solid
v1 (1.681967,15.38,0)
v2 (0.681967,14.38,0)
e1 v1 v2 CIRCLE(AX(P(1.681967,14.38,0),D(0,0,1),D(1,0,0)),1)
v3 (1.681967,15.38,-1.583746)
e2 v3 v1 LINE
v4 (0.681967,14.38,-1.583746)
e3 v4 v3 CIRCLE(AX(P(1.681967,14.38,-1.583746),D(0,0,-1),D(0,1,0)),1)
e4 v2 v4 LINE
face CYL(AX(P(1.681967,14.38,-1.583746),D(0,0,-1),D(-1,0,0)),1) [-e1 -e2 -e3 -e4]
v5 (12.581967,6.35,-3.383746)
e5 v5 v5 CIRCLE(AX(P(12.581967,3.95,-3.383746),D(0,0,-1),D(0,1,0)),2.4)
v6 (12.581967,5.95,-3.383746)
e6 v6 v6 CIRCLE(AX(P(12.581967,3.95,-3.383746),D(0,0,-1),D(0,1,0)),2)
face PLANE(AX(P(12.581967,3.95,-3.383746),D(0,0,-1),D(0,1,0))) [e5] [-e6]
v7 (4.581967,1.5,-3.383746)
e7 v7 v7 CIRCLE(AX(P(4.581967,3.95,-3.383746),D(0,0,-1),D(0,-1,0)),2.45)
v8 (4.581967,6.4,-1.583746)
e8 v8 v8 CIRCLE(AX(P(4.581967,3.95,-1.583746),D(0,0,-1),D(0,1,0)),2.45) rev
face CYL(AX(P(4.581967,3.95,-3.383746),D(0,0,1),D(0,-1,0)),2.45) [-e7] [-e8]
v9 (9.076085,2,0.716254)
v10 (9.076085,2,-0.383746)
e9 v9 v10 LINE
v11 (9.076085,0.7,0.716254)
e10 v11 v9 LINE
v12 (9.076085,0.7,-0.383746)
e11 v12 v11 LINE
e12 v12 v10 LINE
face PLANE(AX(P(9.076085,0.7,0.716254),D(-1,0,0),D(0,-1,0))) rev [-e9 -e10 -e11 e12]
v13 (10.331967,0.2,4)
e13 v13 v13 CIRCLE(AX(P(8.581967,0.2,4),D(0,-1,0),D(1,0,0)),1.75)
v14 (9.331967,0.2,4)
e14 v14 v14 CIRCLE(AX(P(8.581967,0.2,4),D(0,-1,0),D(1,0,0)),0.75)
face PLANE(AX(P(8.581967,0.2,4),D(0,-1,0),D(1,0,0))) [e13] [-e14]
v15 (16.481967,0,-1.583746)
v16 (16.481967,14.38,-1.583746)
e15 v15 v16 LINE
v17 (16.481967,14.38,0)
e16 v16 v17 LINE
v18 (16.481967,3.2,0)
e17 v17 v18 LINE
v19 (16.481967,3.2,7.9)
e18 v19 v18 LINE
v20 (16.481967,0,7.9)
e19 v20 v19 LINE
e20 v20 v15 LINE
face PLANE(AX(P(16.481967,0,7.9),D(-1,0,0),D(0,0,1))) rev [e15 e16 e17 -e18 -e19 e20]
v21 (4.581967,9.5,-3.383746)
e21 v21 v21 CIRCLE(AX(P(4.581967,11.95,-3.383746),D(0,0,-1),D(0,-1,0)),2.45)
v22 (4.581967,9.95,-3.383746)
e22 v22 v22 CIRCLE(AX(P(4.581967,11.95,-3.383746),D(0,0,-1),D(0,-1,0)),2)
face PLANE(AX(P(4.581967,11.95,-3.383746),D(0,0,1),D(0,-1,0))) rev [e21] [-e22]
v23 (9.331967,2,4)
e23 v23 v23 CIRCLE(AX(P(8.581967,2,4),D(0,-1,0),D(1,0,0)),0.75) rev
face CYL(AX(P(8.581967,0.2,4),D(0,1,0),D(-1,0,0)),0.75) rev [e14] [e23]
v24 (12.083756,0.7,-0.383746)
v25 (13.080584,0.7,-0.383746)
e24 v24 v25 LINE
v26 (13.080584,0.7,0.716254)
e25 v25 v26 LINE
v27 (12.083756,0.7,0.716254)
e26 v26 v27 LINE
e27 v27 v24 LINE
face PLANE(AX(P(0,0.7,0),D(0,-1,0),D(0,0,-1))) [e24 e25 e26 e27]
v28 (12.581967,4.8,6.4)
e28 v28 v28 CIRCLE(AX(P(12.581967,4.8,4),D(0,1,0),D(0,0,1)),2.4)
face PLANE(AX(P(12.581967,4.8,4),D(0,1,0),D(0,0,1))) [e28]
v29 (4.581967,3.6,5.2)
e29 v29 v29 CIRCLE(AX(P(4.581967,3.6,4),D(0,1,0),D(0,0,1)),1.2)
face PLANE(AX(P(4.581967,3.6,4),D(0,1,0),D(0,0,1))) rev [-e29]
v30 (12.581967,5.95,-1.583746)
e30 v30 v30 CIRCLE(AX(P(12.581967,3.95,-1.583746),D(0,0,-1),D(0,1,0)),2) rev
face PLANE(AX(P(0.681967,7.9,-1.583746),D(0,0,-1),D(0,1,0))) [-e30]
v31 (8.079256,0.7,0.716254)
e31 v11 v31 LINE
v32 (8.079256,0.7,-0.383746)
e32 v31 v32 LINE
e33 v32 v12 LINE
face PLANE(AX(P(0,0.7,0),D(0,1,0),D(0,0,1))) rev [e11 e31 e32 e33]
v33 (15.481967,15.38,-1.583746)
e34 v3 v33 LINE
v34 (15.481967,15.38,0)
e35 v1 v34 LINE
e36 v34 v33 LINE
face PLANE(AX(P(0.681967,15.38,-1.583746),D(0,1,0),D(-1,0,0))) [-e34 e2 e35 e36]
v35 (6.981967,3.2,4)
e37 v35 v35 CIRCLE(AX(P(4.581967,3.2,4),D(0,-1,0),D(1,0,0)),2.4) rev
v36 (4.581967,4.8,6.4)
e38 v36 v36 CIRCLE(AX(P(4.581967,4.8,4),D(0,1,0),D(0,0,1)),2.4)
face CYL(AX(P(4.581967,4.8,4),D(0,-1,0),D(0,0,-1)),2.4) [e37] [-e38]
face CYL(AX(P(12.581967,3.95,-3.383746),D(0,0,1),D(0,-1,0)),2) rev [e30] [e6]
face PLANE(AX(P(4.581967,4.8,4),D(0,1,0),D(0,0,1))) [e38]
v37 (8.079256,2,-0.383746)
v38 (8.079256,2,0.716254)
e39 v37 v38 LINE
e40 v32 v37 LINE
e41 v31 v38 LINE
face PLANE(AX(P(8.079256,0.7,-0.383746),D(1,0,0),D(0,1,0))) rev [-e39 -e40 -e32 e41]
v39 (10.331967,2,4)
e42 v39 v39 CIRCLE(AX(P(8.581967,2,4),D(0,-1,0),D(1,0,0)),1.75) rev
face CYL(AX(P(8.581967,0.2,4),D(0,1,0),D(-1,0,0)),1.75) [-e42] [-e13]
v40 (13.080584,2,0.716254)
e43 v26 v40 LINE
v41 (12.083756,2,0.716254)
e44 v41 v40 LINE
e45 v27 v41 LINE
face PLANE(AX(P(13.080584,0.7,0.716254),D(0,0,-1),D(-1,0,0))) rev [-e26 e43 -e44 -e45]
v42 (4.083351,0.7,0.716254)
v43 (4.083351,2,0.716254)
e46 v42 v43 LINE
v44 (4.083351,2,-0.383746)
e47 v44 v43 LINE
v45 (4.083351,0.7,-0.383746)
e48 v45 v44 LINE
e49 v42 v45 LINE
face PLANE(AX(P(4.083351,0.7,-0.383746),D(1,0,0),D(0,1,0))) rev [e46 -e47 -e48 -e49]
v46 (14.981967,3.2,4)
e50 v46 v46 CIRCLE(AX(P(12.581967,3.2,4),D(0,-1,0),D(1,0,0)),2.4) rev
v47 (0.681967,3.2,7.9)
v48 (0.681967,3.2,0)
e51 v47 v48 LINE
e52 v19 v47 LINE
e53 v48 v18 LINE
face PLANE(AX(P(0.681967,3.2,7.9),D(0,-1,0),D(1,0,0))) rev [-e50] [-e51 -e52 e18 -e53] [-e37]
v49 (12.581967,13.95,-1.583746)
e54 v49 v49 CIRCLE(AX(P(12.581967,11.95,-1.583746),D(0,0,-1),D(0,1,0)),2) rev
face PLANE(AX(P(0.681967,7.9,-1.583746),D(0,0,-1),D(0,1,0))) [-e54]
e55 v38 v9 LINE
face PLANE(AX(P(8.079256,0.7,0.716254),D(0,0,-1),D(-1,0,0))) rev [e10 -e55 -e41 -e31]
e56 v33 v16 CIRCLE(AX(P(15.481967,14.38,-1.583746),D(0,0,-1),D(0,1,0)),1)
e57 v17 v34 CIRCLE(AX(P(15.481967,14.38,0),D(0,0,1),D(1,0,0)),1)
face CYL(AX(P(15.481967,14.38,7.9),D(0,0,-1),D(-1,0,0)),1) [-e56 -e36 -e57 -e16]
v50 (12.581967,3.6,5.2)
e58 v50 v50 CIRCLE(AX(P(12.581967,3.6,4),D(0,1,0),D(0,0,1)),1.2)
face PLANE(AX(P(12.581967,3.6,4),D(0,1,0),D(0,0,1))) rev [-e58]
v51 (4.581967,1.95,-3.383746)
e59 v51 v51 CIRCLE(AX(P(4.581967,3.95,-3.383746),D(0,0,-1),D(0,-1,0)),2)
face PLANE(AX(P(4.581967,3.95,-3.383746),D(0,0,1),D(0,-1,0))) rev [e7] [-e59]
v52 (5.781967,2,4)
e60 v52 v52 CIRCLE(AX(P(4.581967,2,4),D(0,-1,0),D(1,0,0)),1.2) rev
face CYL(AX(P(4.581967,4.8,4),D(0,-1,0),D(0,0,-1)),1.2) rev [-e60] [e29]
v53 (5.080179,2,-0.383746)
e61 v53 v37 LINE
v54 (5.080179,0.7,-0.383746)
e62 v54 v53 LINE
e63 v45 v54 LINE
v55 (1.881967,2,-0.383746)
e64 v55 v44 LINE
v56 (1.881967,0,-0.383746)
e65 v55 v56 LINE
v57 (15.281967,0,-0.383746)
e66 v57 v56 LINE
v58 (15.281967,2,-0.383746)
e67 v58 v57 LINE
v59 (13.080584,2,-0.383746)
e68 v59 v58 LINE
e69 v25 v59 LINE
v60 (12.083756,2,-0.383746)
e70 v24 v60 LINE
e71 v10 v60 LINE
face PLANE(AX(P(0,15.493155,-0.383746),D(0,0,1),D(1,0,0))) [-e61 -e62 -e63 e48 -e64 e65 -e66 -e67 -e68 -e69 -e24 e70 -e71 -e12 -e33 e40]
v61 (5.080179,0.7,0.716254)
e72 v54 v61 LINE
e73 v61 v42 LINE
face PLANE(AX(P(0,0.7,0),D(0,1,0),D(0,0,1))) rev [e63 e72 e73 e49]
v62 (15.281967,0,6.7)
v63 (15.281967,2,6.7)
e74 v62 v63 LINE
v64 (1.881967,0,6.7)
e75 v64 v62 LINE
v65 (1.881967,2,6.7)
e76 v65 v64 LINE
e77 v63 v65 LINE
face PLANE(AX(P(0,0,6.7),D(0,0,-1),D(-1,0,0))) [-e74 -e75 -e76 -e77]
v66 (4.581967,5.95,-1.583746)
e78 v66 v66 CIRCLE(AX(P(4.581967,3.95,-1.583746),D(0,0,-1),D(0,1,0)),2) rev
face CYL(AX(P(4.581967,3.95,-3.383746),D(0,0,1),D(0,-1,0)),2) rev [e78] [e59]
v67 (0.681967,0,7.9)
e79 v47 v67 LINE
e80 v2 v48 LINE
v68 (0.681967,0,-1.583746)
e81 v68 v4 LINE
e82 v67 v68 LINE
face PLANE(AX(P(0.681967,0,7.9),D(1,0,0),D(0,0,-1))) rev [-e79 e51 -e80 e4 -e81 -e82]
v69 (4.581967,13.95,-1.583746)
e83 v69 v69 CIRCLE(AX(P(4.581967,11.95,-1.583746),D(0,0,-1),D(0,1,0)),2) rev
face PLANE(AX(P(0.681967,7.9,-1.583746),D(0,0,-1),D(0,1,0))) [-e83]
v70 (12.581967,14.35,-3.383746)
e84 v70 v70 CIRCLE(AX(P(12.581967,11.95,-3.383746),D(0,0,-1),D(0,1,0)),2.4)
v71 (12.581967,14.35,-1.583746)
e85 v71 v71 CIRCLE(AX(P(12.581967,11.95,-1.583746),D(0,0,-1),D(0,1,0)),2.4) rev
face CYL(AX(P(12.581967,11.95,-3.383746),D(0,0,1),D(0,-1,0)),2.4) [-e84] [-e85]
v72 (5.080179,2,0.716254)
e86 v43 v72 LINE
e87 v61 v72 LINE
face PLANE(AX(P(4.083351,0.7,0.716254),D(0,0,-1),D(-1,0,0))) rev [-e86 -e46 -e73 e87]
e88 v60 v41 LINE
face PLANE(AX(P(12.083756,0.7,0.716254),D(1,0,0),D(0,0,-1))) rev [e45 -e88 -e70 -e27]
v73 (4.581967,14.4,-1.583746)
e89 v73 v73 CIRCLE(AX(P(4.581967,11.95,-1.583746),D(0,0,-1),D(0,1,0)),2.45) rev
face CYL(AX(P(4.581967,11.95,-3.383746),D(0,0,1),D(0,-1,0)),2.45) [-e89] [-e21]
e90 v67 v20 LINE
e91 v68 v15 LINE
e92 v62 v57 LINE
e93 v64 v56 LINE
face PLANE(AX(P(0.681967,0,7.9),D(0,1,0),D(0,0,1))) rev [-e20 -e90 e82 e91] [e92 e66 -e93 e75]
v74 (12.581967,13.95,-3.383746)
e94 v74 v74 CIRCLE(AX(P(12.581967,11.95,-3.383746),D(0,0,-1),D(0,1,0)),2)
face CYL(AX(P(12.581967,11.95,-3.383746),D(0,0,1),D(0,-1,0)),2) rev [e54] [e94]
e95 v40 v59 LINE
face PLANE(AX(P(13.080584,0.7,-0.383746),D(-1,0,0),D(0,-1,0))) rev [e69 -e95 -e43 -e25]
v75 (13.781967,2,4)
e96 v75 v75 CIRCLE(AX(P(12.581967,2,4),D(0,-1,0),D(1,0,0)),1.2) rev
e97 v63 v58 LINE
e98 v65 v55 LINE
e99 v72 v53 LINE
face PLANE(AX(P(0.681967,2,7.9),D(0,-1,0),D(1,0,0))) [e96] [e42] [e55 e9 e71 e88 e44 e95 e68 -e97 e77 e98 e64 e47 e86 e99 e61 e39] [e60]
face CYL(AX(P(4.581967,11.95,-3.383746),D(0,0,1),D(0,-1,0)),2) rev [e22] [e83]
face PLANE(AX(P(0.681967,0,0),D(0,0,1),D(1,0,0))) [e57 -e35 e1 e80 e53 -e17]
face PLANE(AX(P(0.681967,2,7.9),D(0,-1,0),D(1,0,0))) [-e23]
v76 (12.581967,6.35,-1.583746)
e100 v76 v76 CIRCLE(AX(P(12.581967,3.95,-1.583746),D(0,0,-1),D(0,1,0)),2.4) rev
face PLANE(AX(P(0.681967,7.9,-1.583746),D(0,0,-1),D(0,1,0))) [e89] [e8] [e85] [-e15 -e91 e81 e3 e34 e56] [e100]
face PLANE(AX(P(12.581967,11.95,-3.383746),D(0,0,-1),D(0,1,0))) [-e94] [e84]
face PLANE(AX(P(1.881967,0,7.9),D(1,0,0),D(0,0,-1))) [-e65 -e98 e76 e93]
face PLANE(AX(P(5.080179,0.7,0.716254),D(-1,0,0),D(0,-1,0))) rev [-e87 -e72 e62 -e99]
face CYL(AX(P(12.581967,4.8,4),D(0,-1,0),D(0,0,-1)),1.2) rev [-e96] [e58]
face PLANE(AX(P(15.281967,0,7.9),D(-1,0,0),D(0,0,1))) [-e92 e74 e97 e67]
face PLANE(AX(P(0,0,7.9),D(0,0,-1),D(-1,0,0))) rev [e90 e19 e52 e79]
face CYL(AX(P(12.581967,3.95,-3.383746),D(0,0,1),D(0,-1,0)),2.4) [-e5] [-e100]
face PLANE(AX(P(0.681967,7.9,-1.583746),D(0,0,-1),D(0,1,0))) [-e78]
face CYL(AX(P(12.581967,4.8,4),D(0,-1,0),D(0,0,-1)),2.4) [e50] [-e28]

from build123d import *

# Parameters (mm, degrees)
MAINBASESKETCH_W                       = 15.8
MAINBASESKETCH_H                       = 3.2
MAINBASEEXTRUDE_DEPTH                  = 7.9
STUDSSKETCH_R                          = 2.4
STUDSEXTRUDE_DEPTH                     = 1.6
STUDSPATTERN_COUNT                     = 2
STUDSPATTERN_PITCH                     = 8
STUDSPATTERN_COUNT_DIR2                = 2
STUDSPATTERN_PITCH_DIR2                = 8
MAINBASESHELL_T                        = -1.2
LCUTBLUE_DEPTH                         = 19.555463972
LCUTBLUE_DEPTH_BACK                    = 19.555463972
CUTADDEDTOLCUT_DEPTH                   = 2
MADESLIMCUTSKETCH_W                    = 7.9
MADESLIMCUTSKETCH_H                    = 7.9
MADESLIMCUT_DEPTH                      = 19.897228453
MADESLIMFILLEXT_REACH                  = 20.897
SKETCH33_W                             = 5.500952983
SKETCH33_H                             = 1.199047018
SLIMHOLEEXT_START                      = -0.2
SLIMHOLESKETCH_R                       = 1.75
SLIMHOLESKETCH_R_2                     = 0.75
SLIMHOLEEXT_DEPTH                      = 2
SHORTLEXTENSIONSKETCH_W                = 1.583745828
SHORTLEXTENSIONSKETCH_H                = 7.9
SHORTLEXTENDEDCUTSKETCH_W              = 13.4
SHORTLEXTENDEDCUTSKETCH_H              = 1.582792846
SHORTLEXTENDEDCUT_DEPTH                = 2
SHORTLUNDERSTUMPS_START                = -0.2
SHORTLUNDERSTUMPSKETCH_W               = 0.996828098
SHORTLUNDERSTUMPSKETCH_H               = 1.1
SHORTLUNDERSTUMPS_DEPTH                = 1.5
SHORTLUPPERCIRCLES_START               = -0.2
SHORTLUPPERCIRCLESSKETCH_R             = 2.4
SHORTLUPPERCIRCLESSKETCH_R_2           = 2
SHORTLUPPERCIRCLESSKETCH_R_3           = 2.45
SHORTLUPPERCIRCLES_DEPTH               = 2
TALLERLBASEEXTENSIONSKETCH_W           = 1.583745828
TALLERLBASEEXTENSIONSKETCH_H           = 7.48
F_4UPPERCIRCLESTALLERLBASE_START       = -3.383745828
F_4UPPERCIRCLESTALLERLBASE_OUTLINE_R   = 2.45
F_4UPPERCIRCLESTALLERLBASE_OUTLINE_R_2 = 2
F_4UPPERCIRCLESTALLERLBASE_OUTLINE_R_3 = 2.4
F_4UPPERCIRCLESTALLERLBASE_DEPTH       = 1.8
TALLERLBASEOUTERCHAMFER_R              = 1


# Read off the part's stored shape, not the designer's step: 4UpperCirclesTallerLBase
with BuildPart() as part:
    # MainBaseSketch → MainBaseExtrude (new, symmetric)
    with BuildSketch(Plane.XY):
        with Locations((8.581967213, 1.6)):
            Rectangle(MAINBASESKETCH_W, MAINBASESKETCH_H)
    extrude(amount=MAINBASEEXTRUDE_DEPTH, both=True)

    # StudsSketch → StudsExtrude (add)
    with BuildSketch(Plane(origin=(0, 3.2, 0), x_dir=(1, 0, 0), z_dir=(0, 1, 0))):
        with Locations((4.581967213, 4)):
            Circle(STUDSSKETCH_R)
    studsextrude = extrude(amount=STUDSEXTRUDE_DEPTH)

    # StudsPattern: StudsExtrude 2 × 2
    with Locations(*[(j * STUDSPATTERN_PITCH_DIR2, 0, i * STUDSPATTERN_PITCH) for i in range(STUDSPATTERN_COUNT) for j in range(STUDSPATTERN_COUNT_DIR2) if (i, j) != (0, 0)]):
        add(studsextrude)

    # MainBaseShell
    mainbaseshell_openings = [part.faces().sort_by_distance(p)[0] for p in [
        (8.581967213, 0, 0),
    ]]
    offset(amount=MAINBASESHELL_T, openings=mainbaseshell_openings, kind=Kind.INTERSECTION)

    # LCUTBlueSketch → LCutBlue (cut, two sides: drawn at the far end of the back side and taken through both)
    with BuildSketch(Plane(origin=(0, 3.2, 0), x_dir=(1, 0, 0), z_dir=(0, 1, 0)).offset(-LCUTBLUE_DEPTH_BACK)):
        Polygon((8.581967213, 53.229874044), (8.581967213, 7.9), (8.581967213, 0), (16.481967213, 0), (61.811841258, 0), (125.917963912, 64.106122654), (72.688089868, 117.335996699), align=None)
    extrude(amount=LCUTBLUE_DEPTH + LCUTBLUE_DEPTH_BACK, mode=Mode.SUBTRACT)

    # CutAddedtoLSketch → CutAddedToLCut (add)
    with BuildSketch(Plane.XZ):
        Polygon((7.382920196, -6.7), (8.581967213, -6.7), (8.581967213, 0), (15.281967213, 0), (15.281967213, 1.199047018), (7.382920196, 1.199047018), (7.382920196, 0), align=None)
    extrude(amount=-CUTADDEDTOLCUT_DEPTH)

    # MadeSlimCutSketch → MadeSlimCut (cut, through all)
    with BuildSketch(Plane.XZ):
        with Locations((4.631967213, -3.95)):
            Rectangle(MADESLIMCUTSKETCH_W, MADESLIMCUTSKETCH_H)
    extrude(amount=-MADESLIMCUT_DEPTH, mode=Mode.SUBTRACT)

    # Sketch33 → MadeSlimFillExt (add, up to next)
    with BuildSketch(Plane.XZ, mode=Mode.PRIVATE) as madeslimfillext_sk1:
        with Locations((4.632443704, 0.599523509)):
            Rectangle(SKETCH33_W, SKETCH33_H)
    madeslimfillext_tool1 = extrude(madeslimfillext_sk1.sketch, amount=-MADESLIMFILLEXT_REACH, mode=Mode.PRIVATE) - part.part
    add(madeslimfillext_tool1.solids().sort_by_distance((4.632444, 0, 0.599524))[0])

    # SlimHoleSketch → SlimHoleExt (add)
    with BuildSketch(Plane.XZ.offset(-2).offset(SLIMHOLEEXT_START)):
        with Locations((8.581967213, 4)):
            Circle(SLIMHOLESKETCH_R)
        with Locations((8.581967213, 4)):
            Circle(SLIMHOLESKETCH_R_2, mode=Mode.SUBTRACT)
    extrude(amount=SLIMHOLEEXT_DEPTH)

    # ShortLExtension: sweep along a curve in space
    with BuildLine() as shortlextension_path:
        Line((0.681967213, 3.2, 0), (16.481967213, 3.2, 0))
    # ShortLExtensionSketch → ShortLExtension (sweep)
    with BuildSketch(Plane(origin=(16.481967213, 0, 0), x_dir=(0, 0, -1), z_dir=(1, 0, 0))):
        with Locations((0.791872914, 3.95)):
            Rectangle(SHORTLEXTENSIONSKETCH_W, SHORTLEXTENSIONSKETCH_H)
    sweep(path=shortlextension_path.line)

    # ShortLExtendedCutSketch → ShortLExtendedCut (cut)
    with BuildSketch(Plane.XZ):
        with Locations((8.581967213, 0.407650595)):
            Rectangle(SHORTLEXTENDEDCUTSKETCH_W, SHORTLEXTENDEDCUTSKETCH_H)
    extrude(amount=-SHORTLEXTENDEDCUT_DEPTH, mode=Mode.SUBTRACT)

    # ShortLUnderStumpSketch → ShortLUnderStumps (add)
    with BuildSketch(Plane.XZ.offset(-2).offset(SHORTLUNDERSTUMPS_START)):
        with Locations((4.581764801, 0.166254172)):
            Rectangle(SHORTLUNDERSTUMPSKETCH_W, SHORTLUNDERSTUMPSKETCH_H)
        with Locations((8.57767054, 0.166254172)):
            Rectangle(SHORTLUNDERSTUMPSKETCH_W, SHORTLUNDERSTUMPSKETCH_H)
        with Locations((12.582169625, 0.166254172)):
            Rectangle(SHORTLUNDERSTUMPSKETCH_W, SHORTLUNDERSTUMPSKETCH_H)
    extrude(amount=SHORTLUNDERSTUMPS_DEPTH)

    # ShortLUpperCirclesSketch → ShortLUpperCircles (add)
    # profile 1 of 2: a face of its own
    with BuildSketch(Plane(origin=(0, 0, -1.583745828), x_dir=(-1, 0, 0), z_dir=(0, 0, -1)).offset(SHORTLUPPERCIRCLES_START)):
        with Locations(Location((-12.581967213, 3.95, 0), (0, 0, 90))):
            Circle(SHORTLUPPERCIRCLESSKETCH_R)
        with Locations(Location((-12.581967213, 3.95, 0), (0, 0, 90))):
            Circle(SHORTLUPPERCIRCLESSKETCH_R_2, mode=Mode.SUBTRACT)
    # profile 2 of 2: a face of its own
    with BuildSketch(Plane(origin=(0, 0, -1.583745828), x_dir=(-1, 0, 0), z_dir=(0, 0, -1)).offset(SHORTLUPPERCIRCLES_START)):
        with Locations(Location((-4.581967213, 3.95, 0), (0, 0, 270))):
            Circle(SHORTLUPPERCIRCLESSKETCH_R_3)
        with Locations(Location((-4.581967213, 3.95, 0), (0, 0, 270))):
            Circle(SHORTLUPPERCIRCLESSKETCH_R_2, mode=Mode.SUBTRACT)
    extrude(amount=SHORTLUPPERCIRCLES_DEPTH)

    # TallerLBaseExtension: sweep along a curve in space
    with BuildLine() as tallerlbaseextension_path:
        Line((0.681967213, 7.9, -1.583745828), (16.481967213, 7.9, -1.583745828))
    # TallerLBaseExtensionSketch → TallerLBaseExtension (sweep)
    with BuildSketch(Plane(origin=(16.481967213, 0, 0), x_dir=(0, 0, -1), z_dir=(1, 0, 0))):
        with Locations((0.791872914, 11.64)):
            Rectangle(TALLERLBASEEXTENSIONSKETCH_W, TALLERLBASEEXTENSIONSKETCH_H)
    sweep(path=tallerlbaseextension_path.line)

    # 4UpperCirclesTallerLBase outline → 4UpperCirclesTallerLBase (add)
    # profile 1 of 2: a face of its own
    with BuildSketch(Plane.XY.offset(F_4UPPERCIRCLESTALLERLBASE_START)):
        with Locations((4.581967213, 11.95)):
            Circle(F_4UPPERCIRCLESTALLERLBASE_OUTLINE_R)
        with Locations((4.581967213, 11.95)):
            Circle(F_4UPPERCIRCLESTALLERLBASE_OUTLINE_R_2, mode=Mode.SUBTRACT)
    # profile 2 of 2: a face of its own
    with BuildSketch(Plane.XY.offset(F_4UPPERCIRCLESTALLERLBASE_START)):
        with Locations((12.581967213, 11.95)):
            Circle(F_4UPPERCIRCLESTALLERLBASE_OUTLINE_R_3)
        with Locations((12.581967213, 11.95)):
            Circle(F_4UPPERCIRCLESTALLERLBASE_OUTLINE_R_2, mode=Mode.SUBTRACT)
    extrude(amount=F_4UPPERCIRCLESTALLERLBASE_DEPTH)

    # TallerLBaseOuterChamfer
    tallerlbaseouterchamfer_edges = [part.edges().sort_by_distance(p)[0] for p in [
        (16.481967213, 15.38, -0.791872914),
        (0.681967213, 15.38, -0.791872914),
    ]]
    fillet(tallerlbaseouterchamfer_edges, radius=TALLERLBASEOUTERCHAMFER_R)


solid = part.part
